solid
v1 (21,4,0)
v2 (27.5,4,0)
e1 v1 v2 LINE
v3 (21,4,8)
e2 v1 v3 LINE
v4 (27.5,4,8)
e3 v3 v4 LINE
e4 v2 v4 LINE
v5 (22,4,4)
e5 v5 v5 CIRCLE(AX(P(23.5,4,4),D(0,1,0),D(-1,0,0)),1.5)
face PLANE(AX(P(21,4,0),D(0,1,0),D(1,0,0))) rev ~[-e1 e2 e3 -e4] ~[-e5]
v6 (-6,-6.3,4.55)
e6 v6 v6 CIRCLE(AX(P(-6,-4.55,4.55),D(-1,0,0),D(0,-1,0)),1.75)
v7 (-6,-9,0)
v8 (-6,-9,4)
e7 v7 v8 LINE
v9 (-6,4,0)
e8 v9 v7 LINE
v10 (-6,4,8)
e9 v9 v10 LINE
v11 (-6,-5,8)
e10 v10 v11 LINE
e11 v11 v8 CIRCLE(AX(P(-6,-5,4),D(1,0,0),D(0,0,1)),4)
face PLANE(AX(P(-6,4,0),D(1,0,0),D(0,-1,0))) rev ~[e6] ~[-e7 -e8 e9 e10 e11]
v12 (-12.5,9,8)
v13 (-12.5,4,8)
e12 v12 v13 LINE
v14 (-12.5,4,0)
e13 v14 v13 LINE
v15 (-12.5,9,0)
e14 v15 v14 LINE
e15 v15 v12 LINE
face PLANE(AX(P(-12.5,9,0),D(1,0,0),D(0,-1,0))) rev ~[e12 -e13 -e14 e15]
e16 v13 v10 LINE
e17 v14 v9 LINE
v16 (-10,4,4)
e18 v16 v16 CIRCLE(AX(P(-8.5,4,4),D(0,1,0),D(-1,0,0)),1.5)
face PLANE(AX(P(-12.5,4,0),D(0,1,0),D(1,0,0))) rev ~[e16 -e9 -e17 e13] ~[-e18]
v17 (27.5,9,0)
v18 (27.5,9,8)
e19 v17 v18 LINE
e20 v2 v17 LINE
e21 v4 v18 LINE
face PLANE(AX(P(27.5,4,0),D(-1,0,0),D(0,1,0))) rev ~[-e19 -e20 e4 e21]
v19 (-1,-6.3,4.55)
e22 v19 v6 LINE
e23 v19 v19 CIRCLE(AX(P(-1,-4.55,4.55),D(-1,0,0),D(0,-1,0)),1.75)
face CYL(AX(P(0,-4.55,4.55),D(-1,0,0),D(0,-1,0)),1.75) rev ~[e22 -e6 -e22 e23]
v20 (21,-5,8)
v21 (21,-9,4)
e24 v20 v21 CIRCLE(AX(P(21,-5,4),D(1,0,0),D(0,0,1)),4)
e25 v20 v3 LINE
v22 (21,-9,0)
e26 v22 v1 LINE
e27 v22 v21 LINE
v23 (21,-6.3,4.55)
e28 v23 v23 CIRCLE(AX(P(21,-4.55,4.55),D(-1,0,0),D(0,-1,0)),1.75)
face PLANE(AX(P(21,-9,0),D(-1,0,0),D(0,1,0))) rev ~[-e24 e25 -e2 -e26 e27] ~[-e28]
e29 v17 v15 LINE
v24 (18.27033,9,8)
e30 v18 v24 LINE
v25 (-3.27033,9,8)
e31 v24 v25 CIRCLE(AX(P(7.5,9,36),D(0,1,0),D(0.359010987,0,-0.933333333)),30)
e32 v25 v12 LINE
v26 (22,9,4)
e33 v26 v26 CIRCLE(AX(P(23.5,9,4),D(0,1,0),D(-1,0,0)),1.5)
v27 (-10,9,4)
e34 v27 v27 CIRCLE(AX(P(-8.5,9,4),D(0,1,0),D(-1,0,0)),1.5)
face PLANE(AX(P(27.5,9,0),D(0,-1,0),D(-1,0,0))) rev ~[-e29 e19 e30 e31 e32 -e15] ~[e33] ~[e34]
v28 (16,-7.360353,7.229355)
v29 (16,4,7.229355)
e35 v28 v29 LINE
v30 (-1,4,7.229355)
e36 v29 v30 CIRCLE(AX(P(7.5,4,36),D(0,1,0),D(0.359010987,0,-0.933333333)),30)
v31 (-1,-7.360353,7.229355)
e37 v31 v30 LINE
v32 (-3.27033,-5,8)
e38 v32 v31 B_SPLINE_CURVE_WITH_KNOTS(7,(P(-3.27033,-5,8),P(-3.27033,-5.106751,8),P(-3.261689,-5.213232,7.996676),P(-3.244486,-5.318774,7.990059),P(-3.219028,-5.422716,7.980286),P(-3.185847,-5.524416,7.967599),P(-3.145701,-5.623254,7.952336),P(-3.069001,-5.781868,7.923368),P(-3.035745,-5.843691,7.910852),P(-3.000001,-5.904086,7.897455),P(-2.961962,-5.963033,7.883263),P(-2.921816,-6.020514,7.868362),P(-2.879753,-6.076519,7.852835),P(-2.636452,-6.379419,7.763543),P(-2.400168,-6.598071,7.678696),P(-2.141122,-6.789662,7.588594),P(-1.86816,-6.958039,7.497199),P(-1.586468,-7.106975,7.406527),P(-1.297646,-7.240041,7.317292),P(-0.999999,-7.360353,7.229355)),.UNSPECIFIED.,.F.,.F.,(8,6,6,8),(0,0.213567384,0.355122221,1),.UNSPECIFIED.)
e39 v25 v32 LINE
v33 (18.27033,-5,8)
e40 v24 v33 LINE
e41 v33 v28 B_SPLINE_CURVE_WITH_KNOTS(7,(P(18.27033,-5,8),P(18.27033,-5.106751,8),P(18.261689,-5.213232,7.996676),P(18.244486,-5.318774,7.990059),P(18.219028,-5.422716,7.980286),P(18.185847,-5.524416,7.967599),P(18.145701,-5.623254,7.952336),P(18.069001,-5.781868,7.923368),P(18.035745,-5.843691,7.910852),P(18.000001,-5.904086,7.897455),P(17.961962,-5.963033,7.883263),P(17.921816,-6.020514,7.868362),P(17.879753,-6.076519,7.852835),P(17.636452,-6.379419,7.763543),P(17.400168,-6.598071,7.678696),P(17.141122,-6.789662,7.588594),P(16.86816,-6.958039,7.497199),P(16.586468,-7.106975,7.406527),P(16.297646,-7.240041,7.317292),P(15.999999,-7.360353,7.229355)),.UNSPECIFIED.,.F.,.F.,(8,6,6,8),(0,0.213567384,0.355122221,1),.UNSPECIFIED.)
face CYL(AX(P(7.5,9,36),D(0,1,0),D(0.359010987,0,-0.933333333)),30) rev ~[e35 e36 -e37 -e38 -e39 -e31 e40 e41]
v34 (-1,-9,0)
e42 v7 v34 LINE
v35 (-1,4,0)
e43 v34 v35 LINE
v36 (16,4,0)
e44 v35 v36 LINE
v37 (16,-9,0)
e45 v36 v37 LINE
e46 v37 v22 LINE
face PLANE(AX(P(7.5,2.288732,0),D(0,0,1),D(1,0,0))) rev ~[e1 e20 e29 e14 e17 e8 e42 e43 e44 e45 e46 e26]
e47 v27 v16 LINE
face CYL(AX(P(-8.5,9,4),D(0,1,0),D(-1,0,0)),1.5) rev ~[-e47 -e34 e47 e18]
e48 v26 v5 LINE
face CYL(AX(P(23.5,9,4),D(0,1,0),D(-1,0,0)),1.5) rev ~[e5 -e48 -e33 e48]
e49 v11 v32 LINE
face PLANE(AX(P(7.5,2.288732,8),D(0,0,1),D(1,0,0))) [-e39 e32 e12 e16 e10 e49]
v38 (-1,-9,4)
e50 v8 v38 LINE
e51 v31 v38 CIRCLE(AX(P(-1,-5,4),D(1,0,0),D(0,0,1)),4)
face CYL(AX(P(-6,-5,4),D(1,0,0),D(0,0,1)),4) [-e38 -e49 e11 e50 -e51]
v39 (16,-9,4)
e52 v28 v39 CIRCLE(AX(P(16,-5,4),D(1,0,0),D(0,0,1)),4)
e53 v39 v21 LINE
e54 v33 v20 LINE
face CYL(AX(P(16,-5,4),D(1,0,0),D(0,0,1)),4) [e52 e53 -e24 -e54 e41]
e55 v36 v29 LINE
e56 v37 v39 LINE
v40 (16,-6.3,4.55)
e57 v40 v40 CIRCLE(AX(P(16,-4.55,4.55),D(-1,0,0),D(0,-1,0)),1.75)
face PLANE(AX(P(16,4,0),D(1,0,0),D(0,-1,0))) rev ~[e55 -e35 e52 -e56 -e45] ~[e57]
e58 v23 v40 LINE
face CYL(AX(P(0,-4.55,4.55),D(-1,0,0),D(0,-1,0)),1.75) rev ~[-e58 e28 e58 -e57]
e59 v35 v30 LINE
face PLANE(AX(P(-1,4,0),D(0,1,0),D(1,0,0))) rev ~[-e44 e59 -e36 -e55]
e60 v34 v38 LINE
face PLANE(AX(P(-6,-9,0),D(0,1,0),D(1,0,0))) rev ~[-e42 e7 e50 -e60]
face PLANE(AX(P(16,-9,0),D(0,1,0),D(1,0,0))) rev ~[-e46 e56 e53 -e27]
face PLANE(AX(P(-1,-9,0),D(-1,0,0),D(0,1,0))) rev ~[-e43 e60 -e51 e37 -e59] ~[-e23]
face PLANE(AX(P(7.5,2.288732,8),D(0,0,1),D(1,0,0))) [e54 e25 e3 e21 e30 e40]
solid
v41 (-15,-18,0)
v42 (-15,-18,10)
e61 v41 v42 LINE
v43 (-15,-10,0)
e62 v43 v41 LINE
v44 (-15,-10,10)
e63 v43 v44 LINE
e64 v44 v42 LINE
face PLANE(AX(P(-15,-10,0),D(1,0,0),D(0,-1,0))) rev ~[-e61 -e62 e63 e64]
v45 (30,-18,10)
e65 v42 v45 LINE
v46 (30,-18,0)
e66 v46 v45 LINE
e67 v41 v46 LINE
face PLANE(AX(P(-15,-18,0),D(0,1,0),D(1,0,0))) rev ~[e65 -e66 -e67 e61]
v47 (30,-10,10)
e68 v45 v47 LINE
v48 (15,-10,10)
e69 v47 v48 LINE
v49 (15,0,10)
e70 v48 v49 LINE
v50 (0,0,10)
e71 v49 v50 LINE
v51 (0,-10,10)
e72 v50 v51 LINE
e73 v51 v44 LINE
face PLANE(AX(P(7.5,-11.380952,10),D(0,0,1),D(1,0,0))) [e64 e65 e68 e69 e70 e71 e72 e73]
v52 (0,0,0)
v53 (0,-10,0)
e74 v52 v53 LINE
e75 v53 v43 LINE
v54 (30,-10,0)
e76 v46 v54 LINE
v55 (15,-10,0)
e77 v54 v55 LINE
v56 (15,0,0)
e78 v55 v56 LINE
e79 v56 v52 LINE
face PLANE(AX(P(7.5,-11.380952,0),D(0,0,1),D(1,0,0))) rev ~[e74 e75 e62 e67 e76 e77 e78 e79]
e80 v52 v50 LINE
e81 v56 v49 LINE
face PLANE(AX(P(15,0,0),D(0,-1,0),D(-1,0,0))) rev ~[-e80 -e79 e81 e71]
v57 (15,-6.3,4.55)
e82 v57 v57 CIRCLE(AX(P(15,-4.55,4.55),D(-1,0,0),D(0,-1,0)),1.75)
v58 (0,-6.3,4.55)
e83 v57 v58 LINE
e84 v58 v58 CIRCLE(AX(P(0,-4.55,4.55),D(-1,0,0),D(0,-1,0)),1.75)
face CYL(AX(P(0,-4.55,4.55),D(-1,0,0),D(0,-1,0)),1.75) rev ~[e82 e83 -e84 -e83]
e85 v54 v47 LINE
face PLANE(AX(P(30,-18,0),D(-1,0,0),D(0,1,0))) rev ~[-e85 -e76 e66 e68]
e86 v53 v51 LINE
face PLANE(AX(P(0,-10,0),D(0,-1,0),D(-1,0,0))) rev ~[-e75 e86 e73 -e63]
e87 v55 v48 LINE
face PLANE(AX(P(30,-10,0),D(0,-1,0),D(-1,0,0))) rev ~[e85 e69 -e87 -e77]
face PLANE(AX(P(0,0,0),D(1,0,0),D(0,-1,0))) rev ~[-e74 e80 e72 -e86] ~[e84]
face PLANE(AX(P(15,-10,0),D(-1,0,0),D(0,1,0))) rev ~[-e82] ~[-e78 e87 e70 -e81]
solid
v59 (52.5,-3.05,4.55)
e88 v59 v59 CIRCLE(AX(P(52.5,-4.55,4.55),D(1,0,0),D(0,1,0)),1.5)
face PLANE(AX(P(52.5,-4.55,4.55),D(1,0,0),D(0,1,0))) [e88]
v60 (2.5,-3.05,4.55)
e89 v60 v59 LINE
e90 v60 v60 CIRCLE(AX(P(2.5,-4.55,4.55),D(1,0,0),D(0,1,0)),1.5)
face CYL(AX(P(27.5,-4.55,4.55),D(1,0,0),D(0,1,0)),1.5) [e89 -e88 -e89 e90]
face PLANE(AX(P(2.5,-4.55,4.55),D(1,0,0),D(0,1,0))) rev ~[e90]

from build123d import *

# Parameters (mm, degrees)
F1_DEPTH  = 10
F2_DEPTH  = 8
F3_R      = 1.75
F4_DEPTH  = 50
F5_R      = 1.5
F6_DEPTH  = 25
F7_DEPTH  = 1
F8_R      = 4
F9_R      = 1.5
F10_DEPTH = 16.3613527737


with BuildPart() as f1:
    # F0 (on Top) → F1 (new body)
    with BuildSketch(Plane.XY):
        Polygon((15, 0), (0, 0), (0, -10), (-15, -10), (-15, -18), (30, -18), (30, -10), (15, -10), align=None)
    extrude(amount=F1_DEPTH)


with BuildPart() as f2:
    # F0 (on Top) → F2 (new body)
    with BuildSketch(Plane.XY):
        Polygon((-6, 4), (-6, -9), (-1, -9), (-1, 4), (16, 4), (16, -9), (21, -9), (21, 4), (23.5, 4), (27.5, 4), (27.5, 9), (-12.5, 9), (-12.5, 4), (-8.5, 4), align=None)
        with BuildLine():
            ThreePointArc((-7, 5.5), (-7.4393398282, 4.4393398282), (-8.5, 4))
            ThreePointArc((-8.5, 4), (-9.5606601718, 6.5606601718), (-7, 5.5))
        make_face(mode=Mode.SUBTRACT)
        with BuildLine():
            ThreePointArc((25, 5.5), (24.5606601718, 4.4393398282), (23.5, 4))
            ThreePointArc((23.5, 4), (22.4393398282, 6.5606601718), (25, 5.5))
        make_face(mode=Mode.SUBTRACT)
        with BuildLine():
            ThreePointArc((-7, 5.5), (-9.5606601718, 6.5606601718), (-8.5, 4))
            ThreePointArc((-8.5, 4), (-7.4393398282, 4.4393398282), (-7, 5.5))
        make_face()
        with BuildLine():
            ThreePointArc((25, 5.5), (22.4393398282, 6.5606601718), (23.5, 4))
            ThreePointArc((23.5, 4), (24.5606601718, 4.4393398282), (25, 5.5))
        make_face()
    extrude(amount=F2_DEPTH)


with BuildPart() as f4_tool:
    # F3 (on face) → F4 (new body, symmetric)
    with BuildSketch(Plane(origin=(0, 0, 0), x_dir=(0, -1, 0), z_dir=(-1, 0, 0))):
        with Locations((4.55, 4.55)):
            Circle(F3_R)
    extrude(amount=F4_DEPTH, both=True)


with BuildPart() as f1_1:
    add(f1.part)

    # F4: cut by f4_tool
    add(f4_tool.part, mode=Mode.SUBTRACT)

    # F0 (on Top) → F7 (cut)
    with BuildSketch(Plane.XY):
        Polygon((-12.5, 4), (-12.5, -9), (-6, -9), (-6, 4), (-8.5, 4), align=None)
    extrude(amount=F7_DEPTH, mode=Mode.SUBTRACT)


with BuildPart() as f2_1:
    add(f2.part)

    # F4: cut by f4_tool
    add(f4_tool.part, mode=Mode.SUBTRACT)

    # F8
    f8_edges = [f2_1.edges().sort_by_distance(p)[0] for p in [
        (18.5, -9, 8),
        (-3.5, -9, 8),
    ]]
    fillet(f8_edges, radius=F8_R)

    # F9 (on face) → F10 (cut, through all)
    with BuildSketch(Plane(origin=(0, 9, 0), x_dir=(-1, 0, 0), z_dir=(0, 1, 0))):
        with Locations((8.5, 4)):
            Circle(F9_R)
        with Locations((-23.5, 4)):
            Circle(F9_R)
        with BuildLine():
            Line((3.2703296143, 8), (-18.2703296143, 8))
            ThreePointArc((-18.2703296143, 8), (-7.5, 6), (3.2703296143, 8))
        make_face()
    extrude(amount=-F10_DEPTH, mode=Mode.SUBTRACT)


with BuildPart() as f6:
    # F5 (on face) → F6 (new body, symmetric)
    with BuildSketch(Plane.YZ.offset(27.5)):
        with Locations((-4.55, 4.55)):
            Circle(F5_R)
    extrude(amount=F6_DEPTH, both=True)


solid = Compound([f1_1.part, f2_1.part, f6.part])
